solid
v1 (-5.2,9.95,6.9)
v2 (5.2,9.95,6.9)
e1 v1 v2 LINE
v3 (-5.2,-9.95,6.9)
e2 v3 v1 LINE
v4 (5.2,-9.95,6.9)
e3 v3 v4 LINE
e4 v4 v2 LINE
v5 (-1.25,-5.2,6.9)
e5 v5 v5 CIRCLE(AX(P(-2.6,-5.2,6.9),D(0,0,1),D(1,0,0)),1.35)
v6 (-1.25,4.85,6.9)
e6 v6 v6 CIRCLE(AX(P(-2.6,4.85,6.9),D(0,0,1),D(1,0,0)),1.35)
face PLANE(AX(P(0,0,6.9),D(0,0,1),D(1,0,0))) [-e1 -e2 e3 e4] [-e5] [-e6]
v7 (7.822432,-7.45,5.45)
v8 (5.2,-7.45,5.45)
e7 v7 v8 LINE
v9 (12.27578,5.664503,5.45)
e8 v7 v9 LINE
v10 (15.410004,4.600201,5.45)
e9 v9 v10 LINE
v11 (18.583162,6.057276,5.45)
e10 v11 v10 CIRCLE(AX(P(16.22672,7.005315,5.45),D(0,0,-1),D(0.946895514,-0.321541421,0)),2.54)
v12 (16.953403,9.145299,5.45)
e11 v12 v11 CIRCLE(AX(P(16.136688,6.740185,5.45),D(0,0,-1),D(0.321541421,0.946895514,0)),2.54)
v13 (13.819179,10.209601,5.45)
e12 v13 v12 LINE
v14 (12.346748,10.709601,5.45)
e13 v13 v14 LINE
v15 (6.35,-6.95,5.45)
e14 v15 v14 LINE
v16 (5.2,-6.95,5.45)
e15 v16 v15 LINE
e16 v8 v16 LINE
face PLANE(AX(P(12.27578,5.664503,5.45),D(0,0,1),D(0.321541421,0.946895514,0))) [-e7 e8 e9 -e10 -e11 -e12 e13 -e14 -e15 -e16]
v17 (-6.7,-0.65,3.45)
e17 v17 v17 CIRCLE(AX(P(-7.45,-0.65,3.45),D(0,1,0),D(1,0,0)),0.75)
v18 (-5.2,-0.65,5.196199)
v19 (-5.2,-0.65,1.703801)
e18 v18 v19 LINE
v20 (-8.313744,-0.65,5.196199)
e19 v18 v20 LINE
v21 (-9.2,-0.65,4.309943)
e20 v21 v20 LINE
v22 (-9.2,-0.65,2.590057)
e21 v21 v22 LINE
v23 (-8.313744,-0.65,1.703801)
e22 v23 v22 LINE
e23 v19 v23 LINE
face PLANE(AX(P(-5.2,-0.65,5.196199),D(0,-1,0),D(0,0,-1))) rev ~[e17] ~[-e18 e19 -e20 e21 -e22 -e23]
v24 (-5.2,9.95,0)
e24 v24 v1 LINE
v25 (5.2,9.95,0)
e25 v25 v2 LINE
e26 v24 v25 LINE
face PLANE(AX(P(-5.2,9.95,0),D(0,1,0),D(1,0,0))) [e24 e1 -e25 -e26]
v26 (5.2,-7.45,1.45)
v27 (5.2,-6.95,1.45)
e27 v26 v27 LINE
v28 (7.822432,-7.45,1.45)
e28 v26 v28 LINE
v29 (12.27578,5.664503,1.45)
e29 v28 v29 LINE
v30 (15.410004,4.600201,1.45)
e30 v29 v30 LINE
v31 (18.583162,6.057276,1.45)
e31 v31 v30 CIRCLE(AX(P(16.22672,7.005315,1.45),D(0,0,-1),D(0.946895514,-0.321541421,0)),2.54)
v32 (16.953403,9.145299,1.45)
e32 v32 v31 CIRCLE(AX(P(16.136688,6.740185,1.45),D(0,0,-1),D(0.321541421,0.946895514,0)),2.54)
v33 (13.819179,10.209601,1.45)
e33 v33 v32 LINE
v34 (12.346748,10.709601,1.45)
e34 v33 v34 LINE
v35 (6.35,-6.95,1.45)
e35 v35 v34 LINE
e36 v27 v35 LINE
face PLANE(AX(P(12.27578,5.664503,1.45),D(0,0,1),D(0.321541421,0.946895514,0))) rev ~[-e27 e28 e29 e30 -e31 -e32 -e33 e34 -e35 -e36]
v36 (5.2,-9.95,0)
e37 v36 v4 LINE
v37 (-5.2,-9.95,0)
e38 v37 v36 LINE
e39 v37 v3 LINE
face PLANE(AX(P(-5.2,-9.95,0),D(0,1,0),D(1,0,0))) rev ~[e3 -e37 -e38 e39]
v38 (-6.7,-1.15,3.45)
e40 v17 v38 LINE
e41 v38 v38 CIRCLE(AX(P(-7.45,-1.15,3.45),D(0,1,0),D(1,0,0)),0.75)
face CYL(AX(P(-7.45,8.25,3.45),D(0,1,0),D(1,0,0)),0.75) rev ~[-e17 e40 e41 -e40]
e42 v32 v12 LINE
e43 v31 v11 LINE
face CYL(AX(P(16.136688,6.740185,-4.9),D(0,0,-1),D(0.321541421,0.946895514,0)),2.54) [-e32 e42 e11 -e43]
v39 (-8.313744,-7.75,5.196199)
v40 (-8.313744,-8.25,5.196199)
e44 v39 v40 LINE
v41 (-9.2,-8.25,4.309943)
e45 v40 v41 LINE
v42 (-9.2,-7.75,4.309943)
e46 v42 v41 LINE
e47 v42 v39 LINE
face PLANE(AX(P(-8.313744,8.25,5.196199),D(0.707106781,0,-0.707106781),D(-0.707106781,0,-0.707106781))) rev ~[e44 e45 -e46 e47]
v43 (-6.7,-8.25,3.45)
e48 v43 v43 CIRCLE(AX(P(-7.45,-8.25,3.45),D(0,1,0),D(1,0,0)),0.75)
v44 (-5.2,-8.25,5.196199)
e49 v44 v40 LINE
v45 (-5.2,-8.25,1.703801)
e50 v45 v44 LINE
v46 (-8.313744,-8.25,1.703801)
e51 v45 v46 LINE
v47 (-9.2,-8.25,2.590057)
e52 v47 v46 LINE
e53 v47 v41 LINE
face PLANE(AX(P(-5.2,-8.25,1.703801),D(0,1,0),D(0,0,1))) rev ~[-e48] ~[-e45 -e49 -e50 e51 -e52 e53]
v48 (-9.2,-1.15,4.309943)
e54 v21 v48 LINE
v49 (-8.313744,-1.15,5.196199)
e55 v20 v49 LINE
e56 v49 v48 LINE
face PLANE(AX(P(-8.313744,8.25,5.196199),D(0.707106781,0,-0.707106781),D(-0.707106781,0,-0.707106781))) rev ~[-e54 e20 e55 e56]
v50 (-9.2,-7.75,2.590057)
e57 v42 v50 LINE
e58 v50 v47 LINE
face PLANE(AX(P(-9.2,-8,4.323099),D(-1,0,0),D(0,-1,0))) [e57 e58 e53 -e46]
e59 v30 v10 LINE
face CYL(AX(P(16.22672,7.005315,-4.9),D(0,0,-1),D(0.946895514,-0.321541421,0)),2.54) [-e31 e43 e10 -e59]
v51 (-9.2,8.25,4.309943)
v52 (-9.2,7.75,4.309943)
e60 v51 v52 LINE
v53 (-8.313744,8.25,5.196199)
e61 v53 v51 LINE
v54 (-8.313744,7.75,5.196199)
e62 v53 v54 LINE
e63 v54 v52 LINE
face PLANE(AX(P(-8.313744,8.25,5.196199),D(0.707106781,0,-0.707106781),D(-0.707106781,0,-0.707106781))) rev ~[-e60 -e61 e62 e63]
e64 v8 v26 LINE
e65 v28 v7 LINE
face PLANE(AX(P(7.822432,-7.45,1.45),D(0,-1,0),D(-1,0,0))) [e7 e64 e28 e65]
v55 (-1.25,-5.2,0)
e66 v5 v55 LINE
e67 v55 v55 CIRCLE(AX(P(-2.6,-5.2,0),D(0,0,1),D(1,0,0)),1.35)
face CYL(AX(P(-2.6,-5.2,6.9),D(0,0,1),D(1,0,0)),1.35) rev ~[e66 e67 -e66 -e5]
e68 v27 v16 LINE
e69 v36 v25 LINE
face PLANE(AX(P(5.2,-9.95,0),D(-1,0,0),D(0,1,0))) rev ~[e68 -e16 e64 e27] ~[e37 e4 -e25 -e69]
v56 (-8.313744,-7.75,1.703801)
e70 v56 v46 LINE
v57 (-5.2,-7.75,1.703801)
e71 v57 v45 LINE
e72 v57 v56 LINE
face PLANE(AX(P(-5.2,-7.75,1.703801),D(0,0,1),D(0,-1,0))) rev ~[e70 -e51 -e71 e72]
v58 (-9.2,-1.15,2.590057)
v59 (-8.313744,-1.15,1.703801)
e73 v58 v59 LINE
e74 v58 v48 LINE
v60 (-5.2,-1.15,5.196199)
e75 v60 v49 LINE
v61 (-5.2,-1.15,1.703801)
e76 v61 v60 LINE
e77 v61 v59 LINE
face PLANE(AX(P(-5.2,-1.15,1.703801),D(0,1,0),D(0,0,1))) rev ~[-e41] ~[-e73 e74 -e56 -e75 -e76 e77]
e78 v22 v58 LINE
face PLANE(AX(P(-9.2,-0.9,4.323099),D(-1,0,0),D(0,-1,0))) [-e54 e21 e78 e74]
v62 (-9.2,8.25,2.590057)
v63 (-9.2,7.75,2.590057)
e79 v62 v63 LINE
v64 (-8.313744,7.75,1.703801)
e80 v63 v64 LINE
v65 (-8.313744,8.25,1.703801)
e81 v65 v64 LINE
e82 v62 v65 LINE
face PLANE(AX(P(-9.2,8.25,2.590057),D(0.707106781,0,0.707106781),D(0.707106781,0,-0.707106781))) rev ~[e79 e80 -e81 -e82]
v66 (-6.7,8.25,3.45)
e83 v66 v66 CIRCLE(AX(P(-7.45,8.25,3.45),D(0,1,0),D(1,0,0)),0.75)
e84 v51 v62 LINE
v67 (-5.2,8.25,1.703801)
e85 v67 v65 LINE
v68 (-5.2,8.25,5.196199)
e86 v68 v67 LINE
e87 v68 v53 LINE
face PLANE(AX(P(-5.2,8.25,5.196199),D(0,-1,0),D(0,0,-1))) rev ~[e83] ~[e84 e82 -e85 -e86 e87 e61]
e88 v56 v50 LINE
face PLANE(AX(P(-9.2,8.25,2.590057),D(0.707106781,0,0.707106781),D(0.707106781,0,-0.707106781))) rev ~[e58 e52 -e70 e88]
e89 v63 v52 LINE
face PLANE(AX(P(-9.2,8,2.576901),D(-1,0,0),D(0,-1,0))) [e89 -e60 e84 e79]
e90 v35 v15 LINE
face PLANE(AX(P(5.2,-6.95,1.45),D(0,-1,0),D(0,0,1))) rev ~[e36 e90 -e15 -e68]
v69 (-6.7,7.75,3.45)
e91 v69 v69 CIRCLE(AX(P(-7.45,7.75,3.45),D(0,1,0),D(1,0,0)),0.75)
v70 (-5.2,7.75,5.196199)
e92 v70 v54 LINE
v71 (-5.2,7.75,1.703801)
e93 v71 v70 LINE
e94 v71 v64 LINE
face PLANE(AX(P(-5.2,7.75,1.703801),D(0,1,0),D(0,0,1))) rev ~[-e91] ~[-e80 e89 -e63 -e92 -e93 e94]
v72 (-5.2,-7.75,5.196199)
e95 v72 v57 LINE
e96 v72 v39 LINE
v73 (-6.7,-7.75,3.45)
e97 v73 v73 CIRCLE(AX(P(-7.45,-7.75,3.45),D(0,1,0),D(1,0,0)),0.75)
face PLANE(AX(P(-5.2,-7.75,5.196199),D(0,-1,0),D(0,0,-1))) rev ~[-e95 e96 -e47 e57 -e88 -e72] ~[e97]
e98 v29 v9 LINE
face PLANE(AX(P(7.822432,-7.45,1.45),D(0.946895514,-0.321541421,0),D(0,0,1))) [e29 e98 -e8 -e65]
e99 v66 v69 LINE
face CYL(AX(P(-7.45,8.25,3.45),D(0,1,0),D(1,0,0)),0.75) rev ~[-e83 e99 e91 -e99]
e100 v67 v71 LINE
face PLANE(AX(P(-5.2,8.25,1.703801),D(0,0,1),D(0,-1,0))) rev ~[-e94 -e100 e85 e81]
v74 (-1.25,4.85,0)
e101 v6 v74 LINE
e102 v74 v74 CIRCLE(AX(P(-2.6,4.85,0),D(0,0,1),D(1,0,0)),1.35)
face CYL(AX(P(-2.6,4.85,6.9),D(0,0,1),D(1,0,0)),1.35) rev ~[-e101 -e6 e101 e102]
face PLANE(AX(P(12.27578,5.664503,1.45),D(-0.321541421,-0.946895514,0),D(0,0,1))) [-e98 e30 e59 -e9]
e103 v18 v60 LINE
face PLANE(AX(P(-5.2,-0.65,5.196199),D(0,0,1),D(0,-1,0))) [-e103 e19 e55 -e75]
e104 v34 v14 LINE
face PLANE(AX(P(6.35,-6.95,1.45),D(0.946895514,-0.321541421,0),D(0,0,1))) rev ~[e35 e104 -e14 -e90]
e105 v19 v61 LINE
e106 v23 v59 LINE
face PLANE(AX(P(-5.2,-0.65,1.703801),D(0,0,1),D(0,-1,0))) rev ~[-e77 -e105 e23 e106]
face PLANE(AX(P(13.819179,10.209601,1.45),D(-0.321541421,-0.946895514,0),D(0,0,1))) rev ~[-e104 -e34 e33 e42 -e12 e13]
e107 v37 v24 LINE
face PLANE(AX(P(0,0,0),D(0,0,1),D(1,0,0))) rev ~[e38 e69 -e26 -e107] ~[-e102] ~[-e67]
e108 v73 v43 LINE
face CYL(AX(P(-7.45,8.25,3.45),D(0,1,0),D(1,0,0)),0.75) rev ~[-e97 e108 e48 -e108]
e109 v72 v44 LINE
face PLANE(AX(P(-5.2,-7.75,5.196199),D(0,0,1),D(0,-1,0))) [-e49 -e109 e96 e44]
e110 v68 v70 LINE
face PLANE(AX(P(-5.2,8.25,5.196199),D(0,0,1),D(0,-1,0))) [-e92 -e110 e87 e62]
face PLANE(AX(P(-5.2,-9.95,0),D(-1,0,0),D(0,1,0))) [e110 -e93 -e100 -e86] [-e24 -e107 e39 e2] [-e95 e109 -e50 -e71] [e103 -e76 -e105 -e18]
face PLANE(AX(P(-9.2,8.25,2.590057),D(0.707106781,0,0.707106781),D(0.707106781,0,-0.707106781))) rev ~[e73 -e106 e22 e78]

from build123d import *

# Parameters (mm, degrees)
F0_W         = 10.4
F0_H         = 19.9
F1_DEPTH     = 6.9
F2_R         = 1.35
F3_DEPTH     = 6.9
F4_W         = 0.5
F4_H         = 1.746198668
F5_DEPTH     = 4
F7_DEPTH     = 16.5
F8_W         = 0.5
F8_H         = 2
F9_DEPTH     = 1.15
F11_DEPTH    = 4
F12_W        = 1.55500961
F12_H        = 4
F13_DEPTH    = 18.65
F14_W        = 4.8
F14_H        = 4
F15_DEPTH    = 5.85
F16_T1_DEPTH = 16.7


# Not quite as in the source:
# - a fillet or chamfer that OpenCascade refuses, or shapes differently, is made with other operations: its cross-section is extruded or revolved along the edge and cut away or added


with BuildPart() as f1:
    # F0 (on Top) → F1 (new body)
    with BuildSketch(Plane.XY):
        Rectangle(F0_W, F0_H)
    extrude(amount=F1_DEPTH)

    # F2 (on face) → F3 (cut, through all)
    with BuildSketch(Plane.XY.offset(6.9)):
        with Locations((-2.6, 4.85)):
            Circle(F2_R)
        with Locations((-2.6, -5.2)):
            Circle(F2_R)
    extrude(amount=-F3_DEPTH, mode=Mode.SUBTRACT)

    # F4 (on face) → F5 (join)
    with BuildSketch(Plane(origin=(-5.2, 0, 0), x_dir=(0, -1, 0), z_dir=(-1, 0, 0))):
        with Locations((-8, 2.576900666)):
            Rectangle(F4_W, F4_H)
        with Locations((8, 4.323099334)):
            Rectangle(F4_W, F4_H)
        with Locations((8, 2.576900666)):
            Rectangle(F4_W, F4_H)
        with Locations((0.9, 4.323099334)):
            Rectangle(F4_W, F4_H)
        with Locations((0.9, 2.576900666)):
            Rectangle(F4_W, F4_H)
        with Locations((-8, 4.323099334)):
            Rectangle(F4_W, F4_H)
    extrude(amount=F5_DEPTH)

    # F6 (on face) → F7 (cut, through all)
    with BuildSketch(Plane(origin=(0, 8.25, 0), x_dir=(-1, 0, 0), z_dir=(0, 1, 0))):
        with BuildLine():
            Line((6.7, 3.45), (8.2, 3.45))
            ThreePointArc((8.2, 3.45), (7.45, 4.2), (6.7, 3.45))
        make_face()
        with BuildLine():
            ThreePointArc((6.7, 3.45), (7.45, 2.7), (8.2, 3.45))
            Line((8.2, 3.45), (6.7, 3.45))
        make_face()
        Polygon((9.2, 5.196198668), (8.3137443289, 5.196198668), (9.2, 4.3099429969), align=None)
        Polygon((9.2, 1.703801332), (9.2, 2.5900570031), (8.3137443289, 1.703801332), align=None)
    extrude(amount=-F7_DEPTH, mode=Mode.SUBTRACT)

    # F8 (on face) → F9 (join)
    with BuildSketch(Plane.YZ.offset(5.2)):
        with Locations((-7.2, 2.45)):
            Rectangle(F8_W, F8_H)
        with Locations((-7.2, 4.45)):
            Rectangle(F8_W, F8_H)
    extrude(amount=F9_DEPTH)

    # F10 (on face) → F11 (join, through all)
    with BuildSketch(Plane(origin=(0, 0, 1.45), x_dir=(1, 0, 0), z_dir=(0, 0, -1))):
        Polygon((6.35, 7.45), (6.35, 6.95), (7.8224316239, 7.45), align=None)
    extrude(amount=-F11_DEPTH)

    # F12 (on face) → F13 (join)
    with BuildSketch(Plane(origin=(-1.4595201755, -4.2980873242, 0), x_dir=(-0.946895514, 0.3215414212, 0), z_dir=(0.3215414212, 0.946895514, 0))):
        with Locations((-9.0250041964, 3.45)):
            Rectangle(F12_W, F12_H)
    extrude(amount=F13_DEPTH)

    # F14 (on face) → F15 (join)
    with BuildSketch(Plane(origin=(9.2819517994, -3.1519126758, 0), x_dir=(0.3215414212, 0.946895514, 0), z_dir=(0.946895514, -0.3215414212, 0))):
        with Locations((11.7108642024, 3.45)):
            Rectangle(F14_W, F14_H)
    extrude(amount=F15_DEPTH)

    # F16: fillet of radius 2.54 on 2 edges, made by hand

    # F16_s2 → F16_t1 (cut)
    with BuildSketch(Plane.XY.offset(-4.9)):
        with BuildLine():
            ThreePointArc((16.953403281, 9.145299232), (18.4148657814, 7.8633526103), (18.5418026766, 5.9234694165))
            Line((18.5418026766, 5.9234694165), (19.3585178865, 8.3285840221))
            Line((19.3585178865, 8.3285840221), (16.953403281, 9.145299232))
        make_face()
        with BuildLine():
            ThreePointArc((18.6318342746, 6.1886001604), (17.3498876529, 4.72713766), (15.4100044591, 4.6002007647))
            Line((15.4100044591, 4.6002007647), (17.8151190647, 3.7834855549))
            Line((17.8151190647, 3.7834855549), (18.6318342746, 6.1886001604))
        make_face()
    extrude(amount=F16_T1_DEPTH, mode=Mode.SUBTRACT)


solid = f1.part
